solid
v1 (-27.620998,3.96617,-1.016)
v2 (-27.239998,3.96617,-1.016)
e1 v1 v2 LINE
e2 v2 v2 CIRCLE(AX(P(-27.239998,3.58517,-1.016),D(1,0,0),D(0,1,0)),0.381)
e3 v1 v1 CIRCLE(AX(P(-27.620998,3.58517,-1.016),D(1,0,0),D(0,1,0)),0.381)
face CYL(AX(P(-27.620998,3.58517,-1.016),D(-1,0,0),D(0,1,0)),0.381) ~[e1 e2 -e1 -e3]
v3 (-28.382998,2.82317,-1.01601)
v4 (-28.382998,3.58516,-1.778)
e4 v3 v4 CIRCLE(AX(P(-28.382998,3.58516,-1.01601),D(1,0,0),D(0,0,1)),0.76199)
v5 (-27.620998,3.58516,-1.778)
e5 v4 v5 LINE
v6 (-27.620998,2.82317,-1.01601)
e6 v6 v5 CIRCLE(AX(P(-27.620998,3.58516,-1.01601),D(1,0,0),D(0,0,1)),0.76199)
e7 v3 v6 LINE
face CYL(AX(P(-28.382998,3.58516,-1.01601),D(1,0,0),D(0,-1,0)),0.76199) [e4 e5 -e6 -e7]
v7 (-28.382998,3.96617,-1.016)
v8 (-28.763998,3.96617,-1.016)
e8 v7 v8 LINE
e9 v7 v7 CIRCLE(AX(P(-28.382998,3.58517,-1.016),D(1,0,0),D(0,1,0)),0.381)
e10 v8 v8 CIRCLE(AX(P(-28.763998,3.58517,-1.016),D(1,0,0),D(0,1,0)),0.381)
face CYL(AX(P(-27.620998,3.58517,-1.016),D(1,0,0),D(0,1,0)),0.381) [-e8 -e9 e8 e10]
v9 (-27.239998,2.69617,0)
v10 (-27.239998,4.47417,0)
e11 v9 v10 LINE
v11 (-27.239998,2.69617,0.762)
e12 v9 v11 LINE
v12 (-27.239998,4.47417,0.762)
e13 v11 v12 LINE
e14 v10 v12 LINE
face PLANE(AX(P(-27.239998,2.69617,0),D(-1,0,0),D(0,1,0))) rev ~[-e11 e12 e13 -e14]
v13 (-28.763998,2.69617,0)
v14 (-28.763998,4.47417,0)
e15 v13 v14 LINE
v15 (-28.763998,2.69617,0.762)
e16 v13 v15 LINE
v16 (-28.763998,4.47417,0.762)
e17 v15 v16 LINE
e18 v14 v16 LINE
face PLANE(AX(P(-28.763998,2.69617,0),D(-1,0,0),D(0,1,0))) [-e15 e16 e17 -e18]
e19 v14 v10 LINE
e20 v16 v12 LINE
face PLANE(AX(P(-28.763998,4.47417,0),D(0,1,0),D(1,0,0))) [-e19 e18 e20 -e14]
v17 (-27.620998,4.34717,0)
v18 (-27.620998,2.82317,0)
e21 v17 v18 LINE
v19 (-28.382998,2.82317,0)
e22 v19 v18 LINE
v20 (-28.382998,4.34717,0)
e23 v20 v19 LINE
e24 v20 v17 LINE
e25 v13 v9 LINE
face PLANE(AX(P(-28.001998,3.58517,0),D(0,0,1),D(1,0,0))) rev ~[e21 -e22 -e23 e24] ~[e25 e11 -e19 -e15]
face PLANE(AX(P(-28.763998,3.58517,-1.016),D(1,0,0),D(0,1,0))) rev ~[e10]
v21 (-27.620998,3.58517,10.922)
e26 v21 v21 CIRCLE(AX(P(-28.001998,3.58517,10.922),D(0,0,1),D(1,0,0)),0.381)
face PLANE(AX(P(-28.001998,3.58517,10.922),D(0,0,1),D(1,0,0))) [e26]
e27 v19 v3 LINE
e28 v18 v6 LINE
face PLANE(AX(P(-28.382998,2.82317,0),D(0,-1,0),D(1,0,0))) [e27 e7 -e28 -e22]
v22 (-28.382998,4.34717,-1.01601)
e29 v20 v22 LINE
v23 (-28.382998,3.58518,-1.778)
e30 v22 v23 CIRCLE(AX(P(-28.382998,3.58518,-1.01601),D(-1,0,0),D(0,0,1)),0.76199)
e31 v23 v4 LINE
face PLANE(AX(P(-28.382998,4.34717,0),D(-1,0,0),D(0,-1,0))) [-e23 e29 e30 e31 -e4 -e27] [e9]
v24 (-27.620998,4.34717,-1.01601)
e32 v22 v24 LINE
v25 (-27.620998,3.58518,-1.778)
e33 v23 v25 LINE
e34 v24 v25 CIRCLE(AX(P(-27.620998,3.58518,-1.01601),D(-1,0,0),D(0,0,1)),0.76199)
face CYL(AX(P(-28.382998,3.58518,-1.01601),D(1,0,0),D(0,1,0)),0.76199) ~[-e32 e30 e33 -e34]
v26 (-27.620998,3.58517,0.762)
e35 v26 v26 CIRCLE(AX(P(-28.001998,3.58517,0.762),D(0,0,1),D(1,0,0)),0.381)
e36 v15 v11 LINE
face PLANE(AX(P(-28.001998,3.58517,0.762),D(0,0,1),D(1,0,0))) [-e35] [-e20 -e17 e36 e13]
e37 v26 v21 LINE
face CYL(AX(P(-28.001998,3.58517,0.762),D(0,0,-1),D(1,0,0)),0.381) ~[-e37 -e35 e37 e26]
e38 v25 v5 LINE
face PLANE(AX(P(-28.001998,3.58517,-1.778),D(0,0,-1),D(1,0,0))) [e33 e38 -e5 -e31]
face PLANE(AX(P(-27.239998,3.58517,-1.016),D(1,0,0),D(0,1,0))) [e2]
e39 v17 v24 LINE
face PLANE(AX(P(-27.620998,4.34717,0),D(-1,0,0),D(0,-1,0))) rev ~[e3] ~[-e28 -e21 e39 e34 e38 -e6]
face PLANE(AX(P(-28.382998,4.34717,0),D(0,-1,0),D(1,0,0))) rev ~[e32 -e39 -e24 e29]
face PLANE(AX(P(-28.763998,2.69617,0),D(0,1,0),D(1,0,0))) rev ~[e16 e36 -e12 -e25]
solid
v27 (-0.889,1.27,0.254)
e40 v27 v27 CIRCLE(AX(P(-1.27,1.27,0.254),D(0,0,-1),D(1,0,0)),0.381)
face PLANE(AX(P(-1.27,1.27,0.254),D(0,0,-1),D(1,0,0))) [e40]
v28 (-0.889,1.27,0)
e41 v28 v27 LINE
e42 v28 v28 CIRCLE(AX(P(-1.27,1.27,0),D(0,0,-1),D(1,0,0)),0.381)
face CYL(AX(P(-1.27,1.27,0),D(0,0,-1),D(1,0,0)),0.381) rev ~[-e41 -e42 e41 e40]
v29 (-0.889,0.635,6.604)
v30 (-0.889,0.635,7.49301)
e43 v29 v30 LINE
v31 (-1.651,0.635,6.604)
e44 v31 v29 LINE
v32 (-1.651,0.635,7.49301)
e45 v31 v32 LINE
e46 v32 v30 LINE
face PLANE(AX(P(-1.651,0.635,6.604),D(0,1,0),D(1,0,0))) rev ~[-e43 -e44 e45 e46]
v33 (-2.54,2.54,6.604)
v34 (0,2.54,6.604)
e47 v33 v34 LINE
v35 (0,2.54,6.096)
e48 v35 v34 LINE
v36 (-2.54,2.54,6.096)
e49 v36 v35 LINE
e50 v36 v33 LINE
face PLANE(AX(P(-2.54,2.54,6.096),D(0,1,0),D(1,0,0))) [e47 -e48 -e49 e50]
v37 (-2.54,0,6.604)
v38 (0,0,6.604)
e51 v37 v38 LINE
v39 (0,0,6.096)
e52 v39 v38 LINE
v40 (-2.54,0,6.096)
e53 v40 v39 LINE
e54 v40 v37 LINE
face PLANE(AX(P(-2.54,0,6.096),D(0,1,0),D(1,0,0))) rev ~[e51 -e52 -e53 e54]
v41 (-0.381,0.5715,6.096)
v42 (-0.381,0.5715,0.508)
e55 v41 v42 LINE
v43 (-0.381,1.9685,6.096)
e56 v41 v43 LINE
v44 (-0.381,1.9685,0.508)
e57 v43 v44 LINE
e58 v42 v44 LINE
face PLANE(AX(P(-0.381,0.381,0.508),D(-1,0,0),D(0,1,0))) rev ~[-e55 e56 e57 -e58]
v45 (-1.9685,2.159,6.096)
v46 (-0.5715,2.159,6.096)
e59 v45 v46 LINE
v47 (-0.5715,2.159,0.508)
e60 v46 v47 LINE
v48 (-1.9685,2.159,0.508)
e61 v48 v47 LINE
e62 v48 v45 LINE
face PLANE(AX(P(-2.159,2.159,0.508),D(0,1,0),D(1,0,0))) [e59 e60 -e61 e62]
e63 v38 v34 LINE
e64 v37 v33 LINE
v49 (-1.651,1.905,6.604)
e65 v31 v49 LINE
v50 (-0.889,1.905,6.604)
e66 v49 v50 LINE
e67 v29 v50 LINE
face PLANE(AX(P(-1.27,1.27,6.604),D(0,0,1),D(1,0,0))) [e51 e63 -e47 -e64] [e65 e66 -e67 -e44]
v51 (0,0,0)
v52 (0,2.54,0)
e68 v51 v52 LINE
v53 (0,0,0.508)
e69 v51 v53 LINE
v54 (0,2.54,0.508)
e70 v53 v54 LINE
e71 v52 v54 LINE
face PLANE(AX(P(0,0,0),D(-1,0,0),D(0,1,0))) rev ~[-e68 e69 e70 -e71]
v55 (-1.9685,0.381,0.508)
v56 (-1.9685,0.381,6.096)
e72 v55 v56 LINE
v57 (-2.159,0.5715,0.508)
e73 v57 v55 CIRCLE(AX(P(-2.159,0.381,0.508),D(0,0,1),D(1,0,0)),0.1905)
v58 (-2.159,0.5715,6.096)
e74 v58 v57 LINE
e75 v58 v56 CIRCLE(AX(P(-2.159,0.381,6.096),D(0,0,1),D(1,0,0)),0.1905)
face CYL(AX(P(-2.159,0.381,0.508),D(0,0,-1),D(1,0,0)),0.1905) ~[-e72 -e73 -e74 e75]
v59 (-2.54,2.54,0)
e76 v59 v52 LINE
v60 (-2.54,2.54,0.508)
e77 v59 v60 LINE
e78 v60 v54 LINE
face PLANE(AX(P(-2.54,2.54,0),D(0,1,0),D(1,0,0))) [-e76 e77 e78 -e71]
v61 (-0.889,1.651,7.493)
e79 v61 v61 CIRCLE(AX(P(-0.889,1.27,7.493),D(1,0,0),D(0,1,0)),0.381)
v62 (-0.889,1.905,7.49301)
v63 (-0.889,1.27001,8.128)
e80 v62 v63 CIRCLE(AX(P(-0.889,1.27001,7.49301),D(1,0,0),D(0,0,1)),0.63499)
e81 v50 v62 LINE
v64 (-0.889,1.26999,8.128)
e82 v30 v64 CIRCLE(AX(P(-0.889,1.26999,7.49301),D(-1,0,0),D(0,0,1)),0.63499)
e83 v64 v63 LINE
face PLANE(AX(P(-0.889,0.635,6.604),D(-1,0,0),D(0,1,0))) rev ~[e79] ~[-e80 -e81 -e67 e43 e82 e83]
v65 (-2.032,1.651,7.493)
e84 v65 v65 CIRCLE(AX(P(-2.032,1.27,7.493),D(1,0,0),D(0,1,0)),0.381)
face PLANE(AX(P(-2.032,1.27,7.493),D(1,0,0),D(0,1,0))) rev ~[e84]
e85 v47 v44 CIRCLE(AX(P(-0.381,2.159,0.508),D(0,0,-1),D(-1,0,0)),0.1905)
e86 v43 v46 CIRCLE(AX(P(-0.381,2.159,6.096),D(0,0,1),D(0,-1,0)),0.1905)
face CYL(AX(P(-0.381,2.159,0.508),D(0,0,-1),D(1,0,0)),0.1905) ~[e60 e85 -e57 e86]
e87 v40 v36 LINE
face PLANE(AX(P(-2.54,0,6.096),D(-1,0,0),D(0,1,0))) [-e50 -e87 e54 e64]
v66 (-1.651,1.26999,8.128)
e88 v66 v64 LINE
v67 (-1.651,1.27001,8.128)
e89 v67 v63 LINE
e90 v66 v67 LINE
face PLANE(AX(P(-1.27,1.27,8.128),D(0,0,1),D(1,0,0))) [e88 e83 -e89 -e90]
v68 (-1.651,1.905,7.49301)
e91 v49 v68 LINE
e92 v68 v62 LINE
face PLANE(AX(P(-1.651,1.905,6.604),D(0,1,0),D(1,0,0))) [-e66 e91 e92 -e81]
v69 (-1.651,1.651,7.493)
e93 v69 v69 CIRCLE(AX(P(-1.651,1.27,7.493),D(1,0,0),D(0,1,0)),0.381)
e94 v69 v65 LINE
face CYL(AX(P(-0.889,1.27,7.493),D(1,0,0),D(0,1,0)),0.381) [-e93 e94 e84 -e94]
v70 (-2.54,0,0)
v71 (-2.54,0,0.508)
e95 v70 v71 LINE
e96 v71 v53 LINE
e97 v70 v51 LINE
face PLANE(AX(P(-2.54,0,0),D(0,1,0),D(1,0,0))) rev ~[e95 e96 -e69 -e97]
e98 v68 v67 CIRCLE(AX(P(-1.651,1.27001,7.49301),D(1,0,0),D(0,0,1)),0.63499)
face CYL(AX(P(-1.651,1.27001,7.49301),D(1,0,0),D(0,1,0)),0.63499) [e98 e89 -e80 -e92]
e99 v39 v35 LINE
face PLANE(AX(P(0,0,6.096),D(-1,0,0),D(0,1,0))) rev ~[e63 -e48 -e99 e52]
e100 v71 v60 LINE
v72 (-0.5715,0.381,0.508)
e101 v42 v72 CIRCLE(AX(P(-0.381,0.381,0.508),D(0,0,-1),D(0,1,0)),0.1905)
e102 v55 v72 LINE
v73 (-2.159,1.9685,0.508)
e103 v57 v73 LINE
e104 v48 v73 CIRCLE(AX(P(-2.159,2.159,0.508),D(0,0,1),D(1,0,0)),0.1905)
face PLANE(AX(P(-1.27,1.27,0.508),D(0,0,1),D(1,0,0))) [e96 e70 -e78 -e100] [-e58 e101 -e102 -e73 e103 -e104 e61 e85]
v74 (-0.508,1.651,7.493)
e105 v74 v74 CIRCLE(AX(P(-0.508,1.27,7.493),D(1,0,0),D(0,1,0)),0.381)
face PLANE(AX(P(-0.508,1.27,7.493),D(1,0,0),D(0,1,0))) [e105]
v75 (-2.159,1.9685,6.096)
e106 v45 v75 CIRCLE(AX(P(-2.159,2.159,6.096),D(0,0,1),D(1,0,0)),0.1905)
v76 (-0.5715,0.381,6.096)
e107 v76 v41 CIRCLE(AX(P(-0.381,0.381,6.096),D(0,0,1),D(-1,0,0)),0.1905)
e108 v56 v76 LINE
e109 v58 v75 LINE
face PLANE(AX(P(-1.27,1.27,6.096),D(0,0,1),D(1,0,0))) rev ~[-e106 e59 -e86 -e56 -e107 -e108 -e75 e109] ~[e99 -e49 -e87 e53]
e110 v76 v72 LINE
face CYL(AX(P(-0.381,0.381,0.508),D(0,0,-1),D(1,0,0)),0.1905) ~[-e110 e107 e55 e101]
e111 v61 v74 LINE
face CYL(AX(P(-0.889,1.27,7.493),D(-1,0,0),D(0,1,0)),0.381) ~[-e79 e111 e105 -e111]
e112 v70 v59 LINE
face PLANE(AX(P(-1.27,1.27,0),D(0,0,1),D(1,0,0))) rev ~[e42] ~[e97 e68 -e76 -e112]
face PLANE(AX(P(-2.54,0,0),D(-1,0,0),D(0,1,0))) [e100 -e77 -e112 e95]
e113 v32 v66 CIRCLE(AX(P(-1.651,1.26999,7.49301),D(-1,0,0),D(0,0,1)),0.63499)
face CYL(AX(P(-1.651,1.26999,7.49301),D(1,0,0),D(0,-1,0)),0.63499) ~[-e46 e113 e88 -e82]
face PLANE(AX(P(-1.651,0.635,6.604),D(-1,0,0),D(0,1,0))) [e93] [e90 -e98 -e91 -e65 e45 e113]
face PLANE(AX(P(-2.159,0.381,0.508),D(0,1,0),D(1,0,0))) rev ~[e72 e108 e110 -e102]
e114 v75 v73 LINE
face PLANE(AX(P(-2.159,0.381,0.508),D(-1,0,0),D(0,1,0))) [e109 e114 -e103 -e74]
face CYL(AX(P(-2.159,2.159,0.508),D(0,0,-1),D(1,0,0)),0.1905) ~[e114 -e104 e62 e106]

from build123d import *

# Parameters (mm, degrees)
F0_W           = 2.54
F0_H           = 2.54
F1_DEPTH       = 0.508
F3_R           = 0.1905
F2_W           = 1.778
F2_H           = 1.778
F4_DEPTH       = 5.588
F5_W           = 2.54
F5_H           = 2.54
F6_DEPTH       = 0.508
F7_W           = 0.762
F7_H           = 1.27
F8_DEPTH       = 1.524
F9_R           = 0.63499
F10_R          = 0.381
F11_DEPTH      = 0.254
F12_W          = 1.524
F12_H          = 1.778
F13_DEPTH      = 0.762
F14_R          = 0.381
F15_DEPTH      = 10.16
F16_W          = 0.762
F16_H          = 1.524
F17_DEPTH      = 1.778
F18_R          = 0.76199
F19_R          = 0.381
F20_DEPTH      = 0.381
F20_DEPTH_BACK = 1.143
F21_R          = 0.381
F22_DEPTH      = 0.381
F22_DEPTH_BACK = 1.143


# Not quite as in the source:
# - a fillet or chamfer is up to 0.001 mm smaller than in the source, because OpenCascade refuses the exact size
# - a feature names something its author has since deleted; it is built from what else it names


with BuildPart() as f1:
    # F0 (on Top) → F1 (new body)
    with BuildSketch(Plane.XY):
        with Locations((-1.27, 1.27)):
            Rectangle(F0_W, F0_H)
    extrude(amount=F1_DEPTH)

    # F3 (on face) + F2 (on face) → F4 (join)
    with BuildSketch(Plane.XY.offset(0.508)):
        with Locations((-2.159, 0.381)):
            Circle(F3_R)
        with Locations((-0.381, 0.381)):
            Circle(F3_R)
        with Locations((-0.381, 2.159)):
            Circle(F3_R)
        with Locations((-2.159, 2.159)):
            Circle(F3_R)
    with BuildSketch(Plane.XY.offset(0.508)):
        with Locations((-1.27, 1.27)):
            Rectangle(F2_W, F2_H)
    extrude(amount=F4_DEPTH)

    # F5 (on face) → F6 (join)
    with BuildSketch(Plane.XY.offset(6.096)):
        with Locations((-1.27, 1.27)):
            Rectangle(F5_W, F5_H)
    extrude(amount=F6_DEPTH)

    # F7 (on face) → F8 (join)
    with BuildSketch(Plane.XY.offset(6.604)):
        with Locations((-1.27, 1.27)):
            Rectangle(F7_W, F7_H)
    extrude(amount=F8_DEPTH)

    # F9 (radius 0.635 in the source; OpenCascade refuses exactly that, so slightly less here)
    f9_edges = [f1.edges().sort_by_distance(p)[0] for p in [
        (-1.27, 0.635, 8.128),
        (-1.27, 1.905, 8.128),
    ]]
    fillet(f9_edges, radius=F9_R)

    # F10 (on face) → F11 (cut)
    with BuildSketch(Plane(origin=(0, 0, 0), x_dir=(1, 0, 0), z_dir=(0, 0, -1))):
        with Locations((-1.27, -1.27)):
            Circle(F10_R)
    extrude(amount=-F11_DEPTH, mode=Mode.SUBTRACT)

    # F19 (on face) → F20 (join, two sides)
    with BuildSketch(Plane.YZ.offset(-0.889)) as f20_sk:
        with Locations((1.27, 7.493)):
            Circle(F19_R)
    extrude(amount=F20_DEPTH)
    extrude(f20_sk.sketch, amount=-F20_DEPTH_BACK)


with BuildPart() as f13:
    # F12 (on Top) → F13 (new body)
    with BuildSketch(Plane.XY):
        with Locations((-28.0019982215, 3.5851696832)):
            Rectangle(F12_W, F12_H)
    extrude(amount=F13_DEPTH)

    # F14 (on face) → F15 (join)
    with BuildSketch(Plane.XY.offset(0.762)):
        with Locations((-28.0019982215, 3.5851696832)):
            Circle(F14_R)
    extrude(amount=F15_DEPTH)

    # F16 (on face) → F17 (join)
    with BuildSketch(Plane(origin=(0, 0, 0), x_dir=(1, 0, 0), z_dir=(0, 0, -1))):
        with Locations((-28.0019982215, -3.5851696832)):
            Rectangle(F16_W, F16_H)
    extrude(amount=F17_DEPTH)

    # F18 (radius 0.762 in the source; OpenCascade refuses exactly that, so slightly less here)
    f18_edges = [f13.edges().sort_by_distance(p)[0] for p in [
        (-28.001998, 2.82317, -1.778),
        (-28.001998, 4.34717, -1.778),
    ]]
    fillet(f18_edges, radius=F18_R)

    # F21 (on face) → F22 (join, two sides)
    with BuildSketch(Plane.YZ.offset(-27.6209982215)) as f22_sk:
        with Locations((3.5851696832, -1.016)):
            Circle(F21_R)
    extrude(amount=F22_DEPTH)
    extrude(f22_sk.sketch, amount=-F22_DEPTH_BACK)


solid = Compound([f1.part, f13.part])
